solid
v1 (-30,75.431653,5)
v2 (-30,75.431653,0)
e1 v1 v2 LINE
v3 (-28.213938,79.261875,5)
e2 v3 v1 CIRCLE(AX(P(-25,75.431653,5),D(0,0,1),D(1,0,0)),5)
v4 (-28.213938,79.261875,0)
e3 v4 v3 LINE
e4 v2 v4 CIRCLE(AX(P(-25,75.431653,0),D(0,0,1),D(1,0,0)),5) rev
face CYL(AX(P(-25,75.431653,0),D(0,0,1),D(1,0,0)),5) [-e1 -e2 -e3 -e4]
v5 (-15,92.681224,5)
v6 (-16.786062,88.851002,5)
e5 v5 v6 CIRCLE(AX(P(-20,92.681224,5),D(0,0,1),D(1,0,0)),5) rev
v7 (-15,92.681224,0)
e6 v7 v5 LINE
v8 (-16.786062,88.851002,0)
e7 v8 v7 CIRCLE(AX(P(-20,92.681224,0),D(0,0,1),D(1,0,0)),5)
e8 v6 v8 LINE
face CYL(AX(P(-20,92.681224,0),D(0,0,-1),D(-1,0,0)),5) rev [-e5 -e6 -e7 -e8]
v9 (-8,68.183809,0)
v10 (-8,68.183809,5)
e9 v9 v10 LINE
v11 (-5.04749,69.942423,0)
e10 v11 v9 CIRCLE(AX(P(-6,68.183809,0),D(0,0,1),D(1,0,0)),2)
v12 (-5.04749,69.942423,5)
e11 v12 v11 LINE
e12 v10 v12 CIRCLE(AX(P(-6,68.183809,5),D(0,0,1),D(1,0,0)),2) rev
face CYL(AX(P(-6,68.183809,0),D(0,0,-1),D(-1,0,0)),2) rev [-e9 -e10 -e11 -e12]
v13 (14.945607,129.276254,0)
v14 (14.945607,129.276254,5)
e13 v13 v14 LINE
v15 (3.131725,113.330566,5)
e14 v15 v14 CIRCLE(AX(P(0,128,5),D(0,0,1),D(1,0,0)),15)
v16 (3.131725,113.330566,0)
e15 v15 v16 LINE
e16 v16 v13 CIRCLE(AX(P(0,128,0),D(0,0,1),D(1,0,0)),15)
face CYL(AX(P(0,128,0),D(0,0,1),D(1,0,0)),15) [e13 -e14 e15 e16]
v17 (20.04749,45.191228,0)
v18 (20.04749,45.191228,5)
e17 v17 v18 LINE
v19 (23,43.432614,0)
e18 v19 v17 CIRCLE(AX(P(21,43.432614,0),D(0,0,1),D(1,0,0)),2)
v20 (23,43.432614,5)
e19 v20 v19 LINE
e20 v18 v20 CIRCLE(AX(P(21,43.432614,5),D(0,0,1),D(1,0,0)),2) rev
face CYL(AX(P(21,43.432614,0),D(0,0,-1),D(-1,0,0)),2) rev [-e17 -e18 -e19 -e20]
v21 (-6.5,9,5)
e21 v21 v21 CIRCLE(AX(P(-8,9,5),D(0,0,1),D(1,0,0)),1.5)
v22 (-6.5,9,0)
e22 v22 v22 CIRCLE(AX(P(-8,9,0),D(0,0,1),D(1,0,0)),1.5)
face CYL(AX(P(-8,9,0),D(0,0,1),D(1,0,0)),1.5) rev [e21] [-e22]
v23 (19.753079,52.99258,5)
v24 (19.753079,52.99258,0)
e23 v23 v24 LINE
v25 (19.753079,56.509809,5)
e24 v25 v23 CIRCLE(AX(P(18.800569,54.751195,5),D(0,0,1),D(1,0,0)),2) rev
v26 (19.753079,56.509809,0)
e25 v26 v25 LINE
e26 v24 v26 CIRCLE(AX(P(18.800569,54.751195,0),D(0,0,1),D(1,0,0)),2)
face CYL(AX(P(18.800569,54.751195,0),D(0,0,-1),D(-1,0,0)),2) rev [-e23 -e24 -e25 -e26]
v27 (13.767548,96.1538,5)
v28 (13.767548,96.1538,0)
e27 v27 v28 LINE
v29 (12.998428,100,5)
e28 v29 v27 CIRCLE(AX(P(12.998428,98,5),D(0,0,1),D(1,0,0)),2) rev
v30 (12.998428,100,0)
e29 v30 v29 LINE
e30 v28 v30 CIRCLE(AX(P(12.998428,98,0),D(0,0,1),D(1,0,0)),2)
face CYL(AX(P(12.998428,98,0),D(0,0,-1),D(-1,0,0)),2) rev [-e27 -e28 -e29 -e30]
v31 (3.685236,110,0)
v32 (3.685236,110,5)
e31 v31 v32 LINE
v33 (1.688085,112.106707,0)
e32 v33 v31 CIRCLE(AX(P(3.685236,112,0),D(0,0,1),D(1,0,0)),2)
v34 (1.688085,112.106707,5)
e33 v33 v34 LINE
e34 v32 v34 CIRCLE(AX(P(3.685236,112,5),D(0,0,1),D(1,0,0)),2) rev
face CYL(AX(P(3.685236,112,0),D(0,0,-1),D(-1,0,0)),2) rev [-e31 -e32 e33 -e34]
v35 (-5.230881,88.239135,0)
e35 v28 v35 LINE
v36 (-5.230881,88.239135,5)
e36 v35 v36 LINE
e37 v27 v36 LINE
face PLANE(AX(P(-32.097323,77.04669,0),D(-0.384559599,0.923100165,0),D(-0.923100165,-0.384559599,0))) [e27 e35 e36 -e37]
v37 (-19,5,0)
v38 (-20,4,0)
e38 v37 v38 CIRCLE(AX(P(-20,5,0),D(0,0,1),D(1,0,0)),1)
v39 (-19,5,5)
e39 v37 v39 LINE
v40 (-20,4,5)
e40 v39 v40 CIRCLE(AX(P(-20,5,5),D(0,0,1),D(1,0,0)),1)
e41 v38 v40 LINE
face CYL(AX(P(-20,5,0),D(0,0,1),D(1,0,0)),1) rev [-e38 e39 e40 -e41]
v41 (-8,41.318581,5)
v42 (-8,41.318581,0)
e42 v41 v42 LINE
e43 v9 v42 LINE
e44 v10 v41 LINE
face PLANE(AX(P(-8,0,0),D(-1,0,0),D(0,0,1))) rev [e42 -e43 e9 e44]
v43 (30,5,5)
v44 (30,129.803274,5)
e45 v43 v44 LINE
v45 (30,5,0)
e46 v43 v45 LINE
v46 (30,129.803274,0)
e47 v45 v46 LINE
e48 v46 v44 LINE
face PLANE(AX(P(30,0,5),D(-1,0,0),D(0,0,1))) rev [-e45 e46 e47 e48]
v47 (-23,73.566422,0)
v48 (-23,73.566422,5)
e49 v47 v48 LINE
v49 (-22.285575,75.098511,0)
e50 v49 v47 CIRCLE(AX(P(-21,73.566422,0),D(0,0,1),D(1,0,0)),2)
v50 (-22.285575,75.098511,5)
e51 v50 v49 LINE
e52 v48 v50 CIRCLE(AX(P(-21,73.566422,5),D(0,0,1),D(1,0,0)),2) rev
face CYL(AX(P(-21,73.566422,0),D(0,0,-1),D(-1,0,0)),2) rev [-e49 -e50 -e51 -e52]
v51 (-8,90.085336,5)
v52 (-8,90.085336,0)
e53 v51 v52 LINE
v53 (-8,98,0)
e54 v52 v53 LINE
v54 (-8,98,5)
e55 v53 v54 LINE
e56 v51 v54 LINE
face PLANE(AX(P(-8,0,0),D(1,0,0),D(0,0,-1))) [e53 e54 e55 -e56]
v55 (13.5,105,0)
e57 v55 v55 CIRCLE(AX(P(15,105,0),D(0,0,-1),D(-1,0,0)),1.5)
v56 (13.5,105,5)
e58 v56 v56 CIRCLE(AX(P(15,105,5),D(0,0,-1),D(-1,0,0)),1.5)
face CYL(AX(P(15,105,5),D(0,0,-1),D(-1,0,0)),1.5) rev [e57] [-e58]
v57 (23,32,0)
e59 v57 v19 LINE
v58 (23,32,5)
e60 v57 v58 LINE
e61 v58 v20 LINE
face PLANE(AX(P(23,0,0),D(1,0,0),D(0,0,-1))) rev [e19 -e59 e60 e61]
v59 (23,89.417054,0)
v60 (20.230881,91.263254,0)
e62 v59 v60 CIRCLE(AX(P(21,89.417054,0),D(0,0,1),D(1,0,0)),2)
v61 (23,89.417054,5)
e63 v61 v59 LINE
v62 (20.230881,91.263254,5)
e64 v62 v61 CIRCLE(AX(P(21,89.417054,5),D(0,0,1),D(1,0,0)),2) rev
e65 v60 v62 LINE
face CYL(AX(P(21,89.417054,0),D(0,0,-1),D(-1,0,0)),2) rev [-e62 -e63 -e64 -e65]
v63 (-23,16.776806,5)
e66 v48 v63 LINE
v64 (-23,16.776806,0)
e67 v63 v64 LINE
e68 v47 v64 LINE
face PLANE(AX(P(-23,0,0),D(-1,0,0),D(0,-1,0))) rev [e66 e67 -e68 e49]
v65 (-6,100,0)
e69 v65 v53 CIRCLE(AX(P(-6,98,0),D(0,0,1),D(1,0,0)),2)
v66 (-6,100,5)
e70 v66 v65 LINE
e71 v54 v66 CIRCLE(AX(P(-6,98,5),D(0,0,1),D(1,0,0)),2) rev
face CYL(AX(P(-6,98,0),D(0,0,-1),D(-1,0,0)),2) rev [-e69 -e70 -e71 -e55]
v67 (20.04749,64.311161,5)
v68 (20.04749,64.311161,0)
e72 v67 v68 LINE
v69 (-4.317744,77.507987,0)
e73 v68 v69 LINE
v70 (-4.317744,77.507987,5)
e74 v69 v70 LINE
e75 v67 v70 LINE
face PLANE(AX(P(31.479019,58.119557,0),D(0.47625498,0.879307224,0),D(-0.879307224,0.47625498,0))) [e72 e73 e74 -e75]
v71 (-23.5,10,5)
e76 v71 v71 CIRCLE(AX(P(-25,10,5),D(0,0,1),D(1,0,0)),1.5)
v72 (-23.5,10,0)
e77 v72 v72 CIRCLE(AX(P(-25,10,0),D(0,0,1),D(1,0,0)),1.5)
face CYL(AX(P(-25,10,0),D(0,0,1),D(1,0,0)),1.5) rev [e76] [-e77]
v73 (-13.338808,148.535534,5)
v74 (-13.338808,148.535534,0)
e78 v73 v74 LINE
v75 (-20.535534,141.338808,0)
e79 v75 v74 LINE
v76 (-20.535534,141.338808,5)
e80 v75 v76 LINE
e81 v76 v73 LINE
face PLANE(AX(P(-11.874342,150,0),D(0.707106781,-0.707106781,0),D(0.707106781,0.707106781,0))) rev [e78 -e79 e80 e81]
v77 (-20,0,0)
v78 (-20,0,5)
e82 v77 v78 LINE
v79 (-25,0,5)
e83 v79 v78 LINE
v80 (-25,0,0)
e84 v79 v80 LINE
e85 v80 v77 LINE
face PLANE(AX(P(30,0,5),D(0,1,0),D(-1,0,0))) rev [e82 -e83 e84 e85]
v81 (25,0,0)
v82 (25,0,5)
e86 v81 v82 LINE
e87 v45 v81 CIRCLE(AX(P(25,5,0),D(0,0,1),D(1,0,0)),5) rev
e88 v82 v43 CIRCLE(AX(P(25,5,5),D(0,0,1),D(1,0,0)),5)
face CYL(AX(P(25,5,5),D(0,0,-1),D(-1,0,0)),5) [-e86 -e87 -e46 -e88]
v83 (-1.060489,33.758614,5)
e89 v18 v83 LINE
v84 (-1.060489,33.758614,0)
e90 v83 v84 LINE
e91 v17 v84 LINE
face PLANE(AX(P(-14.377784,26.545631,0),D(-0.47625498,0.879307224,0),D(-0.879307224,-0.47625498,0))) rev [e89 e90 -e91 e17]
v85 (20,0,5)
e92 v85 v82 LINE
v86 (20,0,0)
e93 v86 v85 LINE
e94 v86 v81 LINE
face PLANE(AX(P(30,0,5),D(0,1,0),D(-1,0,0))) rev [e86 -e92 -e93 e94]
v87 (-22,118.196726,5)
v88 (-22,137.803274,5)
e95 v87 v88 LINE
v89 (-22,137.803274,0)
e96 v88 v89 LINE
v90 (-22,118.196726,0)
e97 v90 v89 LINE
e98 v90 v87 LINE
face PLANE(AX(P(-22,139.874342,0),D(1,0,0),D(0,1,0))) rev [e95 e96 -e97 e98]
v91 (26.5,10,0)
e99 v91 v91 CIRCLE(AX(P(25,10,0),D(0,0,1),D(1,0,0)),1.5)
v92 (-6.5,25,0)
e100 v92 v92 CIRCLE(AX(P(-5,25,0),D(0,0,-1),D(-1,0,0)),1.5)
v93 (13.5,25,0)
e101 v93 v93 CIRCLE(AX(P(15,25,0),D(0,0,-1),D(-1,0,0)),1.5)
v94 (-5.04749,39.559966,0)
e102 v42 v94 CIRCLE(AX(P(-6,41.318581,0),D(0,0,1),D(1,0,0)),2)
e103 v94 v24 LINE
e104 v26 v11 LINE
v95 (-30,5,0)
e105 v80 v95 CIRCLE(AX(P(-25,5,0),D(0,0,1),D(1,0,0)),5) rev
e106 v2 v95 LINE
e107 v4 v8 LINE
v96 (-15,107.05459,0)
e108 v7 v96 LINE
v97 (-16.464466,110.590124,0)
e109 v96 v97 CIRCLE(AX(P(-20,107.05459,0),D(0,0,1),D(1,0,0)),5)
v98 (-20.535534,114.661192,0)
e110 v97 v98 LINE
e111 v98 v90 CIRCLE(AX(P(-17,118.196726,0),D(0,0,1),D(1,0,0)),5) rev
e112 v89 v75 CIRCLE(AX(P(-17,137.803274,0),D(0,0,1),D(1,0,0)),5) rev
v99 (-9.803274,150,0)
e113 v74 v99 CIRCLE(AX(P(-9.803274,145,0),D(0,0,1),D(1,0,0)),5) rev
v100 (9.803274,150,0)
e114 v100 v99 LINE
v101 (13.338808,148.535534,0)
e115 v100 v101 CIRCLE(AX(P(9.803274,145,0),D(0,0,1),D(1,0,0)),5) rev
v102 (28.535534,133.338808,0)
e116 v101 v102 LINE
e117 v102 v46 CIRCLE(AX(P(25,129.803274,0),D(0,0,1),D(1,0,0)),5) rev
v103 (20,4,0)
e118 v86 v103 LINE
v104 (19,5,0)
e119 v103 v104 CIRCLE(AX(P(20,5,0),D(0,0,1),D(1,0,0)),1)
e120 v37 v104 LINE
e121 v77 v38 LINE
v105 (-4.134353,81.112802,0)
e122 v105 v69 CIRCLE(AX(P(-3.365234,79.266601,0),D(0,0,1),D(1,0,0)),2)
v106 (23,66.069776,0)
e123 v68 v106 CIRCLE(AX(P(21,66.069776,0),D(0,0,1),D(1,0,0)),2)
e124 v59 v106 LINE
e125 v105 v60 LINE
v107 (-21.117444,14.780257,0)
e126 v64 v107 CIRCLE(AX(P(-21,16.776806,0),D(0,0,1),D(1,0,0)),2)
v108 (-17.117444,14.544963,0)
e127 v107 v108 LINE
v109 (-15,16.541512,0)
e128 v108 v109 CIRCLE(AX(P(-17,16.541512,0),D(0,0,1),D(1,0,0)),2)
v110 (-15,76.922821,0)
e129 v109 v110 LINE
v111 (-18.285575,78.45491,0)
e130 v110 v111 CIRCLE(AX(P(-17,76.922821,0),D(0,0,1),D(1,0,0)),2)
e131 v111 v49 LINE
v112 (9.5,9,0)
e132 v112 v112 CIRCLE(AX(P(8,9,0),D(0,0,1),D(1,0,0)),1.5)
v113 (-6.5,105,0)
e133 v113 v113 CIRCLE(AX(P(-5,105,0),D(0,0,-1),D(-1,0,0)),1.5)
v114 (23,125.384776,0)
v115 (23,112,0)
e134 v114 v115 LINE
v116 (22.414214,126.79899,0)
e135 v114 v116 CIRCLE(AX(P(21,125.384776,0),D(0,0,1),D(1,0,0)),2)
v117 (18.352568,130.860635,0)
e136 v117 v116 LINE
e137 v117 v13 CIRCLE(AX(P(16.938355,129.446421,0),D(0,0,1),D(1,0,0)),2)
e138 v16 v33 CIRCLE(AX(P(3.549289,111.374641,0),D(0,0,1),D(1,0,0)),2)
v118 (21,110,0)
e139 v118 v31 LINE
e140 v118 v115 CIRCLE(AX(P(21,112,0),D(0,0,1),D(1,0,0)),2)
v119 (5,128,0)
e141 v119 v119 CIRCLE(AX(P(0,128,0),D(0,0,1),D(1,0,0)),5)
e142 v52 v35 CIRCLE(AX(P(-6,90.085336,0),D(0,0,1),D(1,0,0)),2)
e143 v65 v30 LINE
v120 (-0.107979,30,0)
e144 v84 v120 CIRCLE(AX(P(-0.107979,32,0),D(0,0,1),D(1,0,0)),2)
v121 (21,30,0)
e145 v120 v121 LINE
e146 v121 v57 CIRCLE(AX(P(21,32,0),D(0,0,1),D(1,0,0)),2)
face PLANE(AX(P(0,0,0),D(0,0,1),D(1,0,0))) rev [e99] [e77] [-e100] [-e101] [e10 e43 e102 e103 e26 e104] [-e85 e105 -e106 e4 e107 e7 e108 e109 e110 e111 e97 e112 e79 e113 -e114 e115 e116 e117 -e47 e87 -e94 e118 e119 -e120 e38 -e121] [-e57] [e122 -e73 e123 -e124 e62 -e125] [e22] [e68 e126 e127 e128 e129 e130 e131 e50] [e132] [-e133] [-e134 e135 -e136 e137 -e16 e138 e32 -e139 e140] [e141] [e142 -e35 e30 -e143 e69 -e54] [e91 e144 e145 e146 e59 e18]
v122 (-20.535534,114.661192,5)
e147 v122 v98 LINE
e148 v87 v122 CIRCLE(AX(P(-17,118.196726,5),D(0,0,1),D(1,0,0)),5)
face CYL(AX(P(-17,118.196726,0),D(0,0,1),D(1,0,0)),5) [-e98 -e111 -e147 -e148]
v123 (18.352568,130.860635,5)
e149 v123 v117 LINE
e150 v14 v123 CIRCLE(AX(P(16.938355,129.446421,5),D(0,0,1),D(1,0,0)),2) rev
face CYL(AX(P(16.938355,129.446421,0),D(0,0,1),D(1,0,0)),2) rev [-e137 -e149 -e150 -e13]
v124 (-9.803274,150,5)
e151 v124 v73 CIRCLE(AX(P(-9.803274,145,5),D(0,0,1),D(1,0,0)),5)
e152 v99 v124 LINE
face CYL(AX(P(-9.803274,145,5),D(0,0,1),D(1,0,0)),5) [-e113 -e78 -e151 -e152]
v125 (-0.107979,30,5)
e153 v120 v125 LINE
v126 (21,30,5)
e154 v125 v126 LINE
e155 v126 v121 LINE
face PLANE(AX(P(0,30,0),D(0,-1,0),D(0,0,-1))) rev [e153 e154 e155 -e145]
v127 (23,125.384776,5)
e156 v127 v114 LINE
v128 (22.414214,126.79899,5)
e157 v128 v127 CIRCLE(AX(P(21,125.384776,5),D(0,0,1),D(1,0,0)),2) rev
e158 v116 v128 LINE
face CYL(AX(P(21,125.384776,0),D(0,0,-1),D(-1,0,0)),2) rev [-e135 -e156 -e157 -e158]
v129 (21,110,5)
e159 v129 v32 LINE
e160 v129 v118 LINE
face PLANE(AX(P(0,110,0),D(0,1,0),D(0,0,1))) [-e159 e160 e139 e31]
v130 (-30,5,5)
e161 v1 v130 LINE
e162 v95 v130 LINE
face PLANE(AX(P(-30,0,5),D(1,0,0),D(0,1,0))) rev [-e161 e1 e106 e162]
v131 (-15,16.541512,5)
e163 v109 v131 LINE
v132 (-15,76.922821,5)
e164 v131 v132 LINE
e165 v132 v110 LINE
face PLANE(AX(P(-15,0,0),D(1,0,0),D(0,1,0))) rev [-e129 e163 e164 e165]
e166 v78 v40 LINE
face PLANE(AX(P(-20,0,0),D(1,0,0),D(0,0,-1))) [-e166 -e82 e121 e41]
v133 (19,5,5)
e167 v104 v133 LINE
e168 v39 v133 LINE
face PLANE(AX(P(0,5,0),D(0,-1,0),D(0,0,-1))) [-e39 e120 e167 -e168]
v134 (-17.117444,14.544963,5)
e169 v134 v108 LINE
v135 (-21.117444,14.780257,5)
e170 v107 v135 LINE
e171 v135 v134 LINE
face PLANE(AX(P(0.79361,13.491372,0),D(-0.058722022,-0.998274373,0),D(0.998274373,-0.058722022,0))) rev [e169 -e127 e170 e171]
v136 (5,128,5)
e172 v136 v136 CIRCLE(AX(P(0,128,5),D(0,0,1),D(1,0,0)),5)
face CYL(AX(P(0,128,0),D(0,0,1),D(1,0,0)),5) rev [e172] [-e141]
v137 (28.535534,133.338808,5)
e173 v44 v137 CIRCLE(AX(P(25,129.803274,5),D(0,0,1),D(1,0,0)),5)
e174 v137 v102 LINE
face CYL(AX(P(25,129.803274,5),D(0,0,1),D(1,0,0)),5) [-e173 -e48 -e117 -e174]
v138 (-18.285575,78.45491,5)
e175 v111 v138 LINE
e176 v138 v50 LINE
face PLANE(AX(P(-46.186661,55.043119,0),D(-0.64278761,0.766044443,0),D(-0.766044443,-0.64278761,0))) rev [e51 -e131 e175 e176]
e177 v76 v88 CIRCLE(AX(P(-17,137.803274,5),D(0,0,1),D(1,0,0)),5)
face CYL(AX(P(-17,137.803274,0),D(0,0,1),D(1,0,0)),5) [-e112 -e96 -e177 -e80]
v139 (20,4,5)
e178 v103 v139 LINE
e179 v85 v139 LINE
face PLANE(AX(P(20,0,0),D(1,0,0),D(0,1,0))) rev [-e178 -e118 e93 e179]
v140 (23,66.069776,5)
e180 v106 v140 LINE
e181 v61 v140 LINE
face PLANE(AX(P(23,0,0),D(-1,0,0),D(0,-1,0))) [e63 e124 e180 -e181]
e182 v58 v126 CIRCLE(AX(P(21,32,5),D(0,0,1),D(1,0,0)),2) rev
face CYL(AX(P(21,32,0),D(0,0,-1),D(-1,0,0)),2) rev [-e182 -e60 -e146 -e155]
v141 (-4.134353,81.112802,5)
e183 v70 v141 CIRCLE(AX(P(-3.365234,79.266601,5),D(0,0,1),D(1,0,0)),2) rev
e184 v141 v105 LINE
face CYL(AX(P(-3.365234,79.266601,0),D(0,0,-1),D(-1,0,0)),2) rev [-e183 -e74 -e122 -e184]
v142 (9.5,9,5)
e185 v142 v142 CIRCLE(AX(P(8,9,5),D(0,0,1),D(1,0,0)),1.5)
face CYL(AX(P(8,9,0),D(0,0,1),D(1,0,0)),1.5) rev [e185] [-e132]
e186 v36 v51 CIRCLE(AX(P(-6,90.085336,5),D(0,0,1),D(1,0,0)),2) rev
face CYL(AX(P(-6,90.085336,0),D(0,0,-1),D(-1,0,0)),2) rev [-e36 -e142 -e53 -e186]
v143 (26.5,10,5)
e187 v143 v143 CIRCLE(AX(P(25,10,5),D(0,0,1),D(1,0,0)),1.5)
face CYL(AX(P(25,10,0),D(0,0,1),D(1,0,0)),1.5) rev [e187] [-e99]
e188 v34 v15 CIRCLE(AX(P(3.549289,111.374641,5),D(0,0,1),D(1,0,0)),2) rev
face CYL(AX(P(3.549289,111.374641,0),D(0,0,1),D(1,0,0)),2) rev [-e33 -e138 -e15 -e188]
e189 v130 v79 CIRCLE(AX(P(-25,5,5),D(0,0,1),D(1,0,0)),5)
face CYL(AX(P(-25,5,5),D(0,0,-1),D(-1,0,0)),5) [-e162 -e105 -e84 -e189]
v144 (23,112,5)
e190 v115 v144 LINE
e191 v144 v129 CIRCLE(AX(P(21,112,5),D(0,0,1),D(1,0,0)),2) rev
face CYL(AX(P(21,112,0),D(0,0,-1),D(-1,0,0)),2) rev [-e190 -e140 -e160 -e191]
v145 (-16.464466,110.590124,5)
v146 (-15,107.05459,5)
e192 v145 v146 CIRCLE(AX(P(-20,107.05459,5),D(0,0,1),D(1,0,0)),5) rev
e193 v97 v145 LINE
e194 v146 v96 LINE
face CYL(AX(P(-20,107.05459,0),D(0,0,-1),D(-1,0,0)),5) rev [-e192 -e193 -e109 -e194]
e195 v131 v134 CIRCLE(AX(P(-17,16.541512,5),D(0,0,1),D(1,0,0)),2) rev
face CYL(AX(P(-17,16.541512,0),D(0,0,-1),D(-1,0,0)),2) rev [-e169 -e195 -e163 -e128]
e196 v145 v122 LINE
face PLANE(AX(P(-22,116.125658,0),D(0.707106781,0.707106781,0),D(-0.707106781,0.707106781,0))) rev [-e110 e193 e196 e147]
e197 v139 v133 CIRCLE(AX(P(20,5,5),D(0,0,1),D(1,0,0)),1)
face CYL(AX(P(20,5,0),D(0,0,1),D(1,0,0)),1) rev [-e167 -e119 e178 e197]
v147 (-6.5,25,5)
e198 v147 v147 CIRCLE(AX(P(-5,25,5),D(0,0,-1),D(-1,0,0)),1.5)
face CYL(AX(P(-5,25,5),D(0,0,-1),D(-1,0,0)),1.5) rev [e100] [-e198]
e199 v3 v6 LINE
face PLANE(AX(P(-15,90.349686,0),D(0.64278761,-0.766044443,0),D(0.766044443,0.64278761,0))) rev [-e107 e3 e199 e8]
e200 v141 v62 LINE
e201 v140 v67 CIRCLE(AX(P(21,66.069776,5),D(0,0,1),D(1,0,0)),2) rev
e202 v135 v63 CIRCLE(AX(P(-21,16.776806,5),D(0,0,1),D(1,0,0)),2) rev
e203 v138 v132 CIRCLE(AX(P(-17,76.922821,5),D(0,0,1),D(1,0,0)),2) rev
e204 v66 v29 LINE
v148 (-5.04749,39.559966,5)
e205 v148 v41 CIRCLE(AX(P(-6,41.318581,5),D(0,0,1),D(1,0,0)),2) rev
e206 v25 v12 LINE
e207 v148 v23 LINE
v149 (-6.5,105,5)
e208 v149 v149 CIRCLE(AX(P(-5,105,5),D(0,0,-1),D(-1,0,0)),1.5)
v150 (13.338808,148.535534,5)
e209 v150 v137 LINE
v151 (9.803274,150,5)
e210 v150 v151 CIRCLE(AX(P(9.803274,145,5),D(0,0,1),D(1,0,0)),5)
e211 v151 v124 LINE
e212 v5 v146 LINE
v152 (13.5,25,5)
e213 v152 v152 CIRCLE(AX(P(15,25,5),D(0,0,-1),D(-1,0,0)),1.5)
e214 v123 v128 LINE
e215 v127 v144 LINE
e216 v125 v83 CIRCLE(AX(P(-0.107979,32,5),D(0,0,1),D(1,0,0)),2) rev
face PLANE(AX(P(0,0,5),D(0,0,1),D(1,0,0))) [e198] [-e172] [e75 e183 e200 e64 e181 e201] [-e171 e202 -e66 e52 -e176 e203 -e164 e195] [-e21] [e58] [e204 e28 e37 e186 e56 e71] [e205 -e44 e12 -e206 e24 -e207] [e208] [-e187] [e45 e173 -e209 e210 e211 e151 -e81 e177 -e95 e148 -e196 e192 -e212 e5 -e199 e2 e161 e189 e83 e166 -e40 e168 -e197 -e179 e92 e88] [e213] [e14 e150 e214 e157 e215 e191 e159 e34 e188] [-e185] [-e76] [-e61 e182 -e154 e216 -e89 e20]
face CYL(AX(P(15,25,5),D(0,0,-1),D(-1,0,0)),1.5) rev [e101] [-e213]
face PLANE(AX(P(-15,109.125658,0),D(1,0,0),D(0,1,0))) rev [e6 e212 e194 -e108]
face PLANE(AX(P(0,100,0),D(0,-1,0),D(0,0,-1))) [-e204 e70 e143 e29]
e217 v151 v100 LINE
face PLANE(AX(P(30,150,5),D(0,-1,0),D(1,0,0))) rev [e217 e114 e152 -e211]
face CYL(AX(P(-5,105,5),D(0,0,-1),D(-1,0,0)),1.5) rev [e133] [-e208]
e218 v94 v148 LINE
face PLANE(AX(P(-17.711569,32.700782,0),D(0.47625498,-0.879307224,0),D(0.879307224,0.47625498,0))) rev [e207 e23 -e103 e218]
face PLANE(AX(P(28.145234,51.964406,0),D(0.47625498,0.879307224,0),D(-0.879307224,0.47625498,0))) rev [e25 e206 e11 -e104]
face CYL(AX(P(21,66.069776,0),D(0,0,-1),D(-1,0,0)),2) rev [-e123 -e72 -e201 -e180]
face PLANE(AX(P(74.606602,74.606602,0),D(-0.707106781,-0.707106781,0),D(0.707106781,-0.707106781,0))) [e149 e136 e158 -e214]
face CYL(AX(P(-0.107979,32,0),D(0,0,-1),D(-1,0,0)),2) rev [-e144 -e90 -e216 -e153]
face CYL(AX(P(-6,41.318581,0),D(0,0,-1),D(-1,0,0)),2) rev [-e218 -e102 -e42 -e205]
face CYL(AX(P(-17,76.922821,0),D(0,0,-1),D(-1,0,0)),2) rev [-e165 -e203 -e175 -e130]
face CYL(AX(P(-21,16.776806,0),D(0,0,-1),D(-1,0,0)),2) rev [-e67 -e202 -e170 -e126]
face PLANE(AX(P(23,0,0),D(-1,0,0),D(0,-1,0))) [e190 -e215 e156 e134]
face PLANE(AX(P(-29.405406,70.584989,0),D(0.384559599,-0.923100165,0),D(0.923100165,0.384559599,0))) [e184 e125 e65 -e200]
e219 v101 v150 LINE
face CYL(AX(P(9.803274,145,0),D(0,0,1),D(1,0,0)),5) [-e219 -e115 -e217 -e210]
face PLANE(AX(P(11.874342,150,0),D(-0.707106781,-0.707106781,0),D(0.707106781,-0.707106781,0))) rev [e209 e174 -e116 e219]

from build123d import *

# Parameters (mm, degrees)
SKETCH_1_W          = 60
SKETCH_1_H          = 150
EXTRUDE_1_DEPTH     = 5
SKETCH_2_R          = 1.5
CUT_EXTRUDE_1_DEPTH = 5
SKETCH_4_R          = 5
PITCH_DEPTH         = 154.05227865
CUT_EXTRUDE_2_DEPTH = 154.05227865
SKETCH_6_R          = 1.5
CUT_EXTRUDE_3_DEPTH = 154.05227865
CUT_EXTRUDE_4_DEPTH = 154.05227865
FILLET_1_R          = 2
FILLET_2_R          = 5


with BuildPart() as part:
    # 草图1 → 凸台-拉伸1 (new body)
    with BuildSketch(Plane.XY):
        with Locations((0, 75)):
            Rectangle(SKETCH_1_W, SKETCH_1_H)
    extrude(amount=EXTRUDE_1_DEPTH)

    # 草图2 → 切除-拉伸1 (cut)
    with BuildSketch(Plane.XY.offset(5)):
        with BuildLine():
            Line((-20, 4), (-20, 0))
            Line((-20, 0), (20, 0))
            Line((20, 0), (20, 4))
            ThreePointArc((20, 4), (20.707106781, 5.707106781), (19, 5))
            Line((19, 5), (-19, 5))
            ThreePointArc((-19, 5), (-20.707106781, 5.707106781), (-20, 4))
        make_face()
        with Locations((-25, 10)):
            Circle(SKETCH_2_R)
        with Locations((25, 10)):
            Circle(SKETCH_2_R)
        with Locations((8, 9)):
            Circle(SKETCH_2_R)
        with Locations((-8, 9)):
            Circle(SKETCH_2_R)
    extrude(amount=-CUT_EXTRUDE_1_DEPTH, mode=Mode.SUBTRACT)

    # 草图4 → pitch (cut, through all)
    with BuildSketch(Plane.XY.offset(5)):
        with Locations((0, 128)):
            Circle(SKETCH_4_R)
    extrude(amount=-PITCH_DEPTH, mode=Mode.SUBTRACT)

    # 草图5 → 切除-拉伸2 (cut, through all)
    with BuildSketch(Plane.XY.offset(5)):
        Polygon((-15, 106.983208217), (-15, 90.349685577), (-30, 77.76319111), (-30, 124.859512106), (-30, 150), (-11.874342087, 150), (-22, 139.874342087), (-22, 116.125657913), (-15, 109.125657913), align=None)
        Polygon((11.874342087, 150), (30, 131.874342087), (30, 150), align=None)
    extrude(amount=-CUT_EXTRUDE_2_DEPTH, mode=Mode.SUBTRACT)

    # 草图6 → 切除-拉伸3 (cut, through all)
    with BuildSketch(Plane(origin=(0, 0, 0), x_dir=(-1, 0, 0), z_dir=(0, 0, -1))):
        with Locations((5, 105)):
            Circle(SKETCH_6_R)
        with Locations((-15, 105)):
            Circle(SKETCH_6_R)
        with Locations((-15, 25)):
            Circle(SKETCH_6_R)
        with Locations((5, 25)):
            Circle(SKETCH_6_R)
    extrude(amount=-CUT_EXTRUDE_3_DEPTH, mode=Mode.SUBTRACT)

    # 草图7 → 切除-拉伸4 (cut, through all)
    with BuildSketch(Plane.XY.offset(5)):
        Polygon((-23, 14.89099599), (-15, 14.420407755), (-15, 81.211834552), (-23, 74.499037502), align=None)
        Polygon((-8, 37.960812568), (23, 54.751194786), (-8, 71.541577003), align=None)
        Polygon((23, 30), (23, 46.790382217), (-8, 30), align=None)
        Polygon((-8, 79.502389571), (23, 92.416857601), (23, 62.712007354), align=None)
        Polygon((-8, 87.08553197), (-8, 100), (23, 100), align=None)
        with BuildLine():
            Line((23, 126.213203436), (10.606601718, 138.606601718))
            ThreePointArc((10.606601718, 138.606601718), (13.858192988, 133.740251485), (15, 128))
            ThreePointArc((15, 128), (11.252224106, 118.080955053), (1.881672979, 113.118491111))
            Line((1.881672979, 113.118491111), (1.203740129, 110))
            Line((1.203740129, 110), (23, 110))
            Line((23, 110), (23, 126.213203436))
        make_face()
    extrude(amount=-CUT_EXTRUDE_4_DEPTH, mode=Mode.SUBTRACT)

    # 圆角1
    # the kernel refuses this fillet: 2 mm, written as the material it adds along each edge
    with BuildSketch(Plane(origin=(23, 92.416857601, 5), x_dir=(0, -1, 0), z_dir=(0, 0, -1))) as fillet_1_piece_1:
        with BuildLine():
            CenterArc((FILLET_1_R * 1.49990179984, FILLET_1_R), FILLET_1_R, 157.383597643, 112.616402357)
            Line((FILLET_1_R * 0.576801634755, FILLET_1_R * 1.38455959905), (FILLET_1_R * 0.558339631453, FILLET_1_R * 1.39225079103))
            Line((FILLET_1_R * 0.558339631453, FILLET_1_R * 1.39225079103), (-FILLET_1_R * 0.0299980359968, -FILLET_1_R * 0.02))
            Line((-FILLET_1_R * 0.0299980359968, -FILLET_1_R * 0.02), (FILLET_1_R * 1.49990179984, -FILLET_1_R * 0.02))
            Line((FILLET_1_R * 1.49990179984, -FILLET_1_R * 0.02), (FILLET_1_R * 1.49990179984, 0))
        make_face()
    extrude(amount=5)
    with BuildSketch(Plane(origin=(23, 62.712007354, 5), x_dir=(0, 1, 0), z_dir=(0, 0, -1)), Plane(origin=(-8, 71.541577003, 5), x_dir=(0, -1, 0), z_dir=(0, 0, -1)), Plane(origin=(-8, 37.960812568, 5), x_dir=(0.8793072239666883, 0.4762549799004691, 0), z_dir=(0, 0, -1))) as fillet_1_piece_2:
        with BuildLine():
            CenterArc((FILLET_1_R * 1.67888417116, -FILLET_1_R), FILLET_1_R, 90, 118.441093136)
            Line((FILLET_1_R * 0.799576947189, -FILLET_1_R * 1.4762549799), (FILLET_1_R * 0.78199080271, -FILLET_1_R * 1.4857800795))
            Line((FILLET_1_R * 0.78199080271, -FILLET_1_R * 1.4857800795), (-FILLET_1_R * 0.0335776834231, FILLET_1_R * 0.02))
            Line((-FILLET_1_R * 0.0335776834231, FILLET_1_R * 0.02), (FILLET_1_R * 1.67888417116, FILLET_1_R * 0.02))
            Line((FILLET_1_R * 1.67888417116, FILLET_1_R * 0.02), (FILLET_1_R * 1.67888417116, 0))
        make_face()
    extrude(amount=5)
    with BuildSketch(Plane(origin=(-8, 79.502389571, 5), x_dir=(0.8793072239666883, -0.4762549799004693, 0), z_dir=(0, 0, -1))) as fillet_1_piece_3:
        with BuildLine():
            CenterArc((FILLET_1_R * 2.09383929261, -FILLET_1_R), FILLET_1_R, 90, 128.942504507)
            Line((FILLET_1_R * 1.31606220856, -FILLET_1_R * 1.62854021949), (FILLET_1_R * 1.30050666688, -FILLET_1_R * 1.64111102388))
            Line((FILLET_1_R * 1.30050666688, -FILLET_1_R * 1.64111102388), (-FILLET_1_R * 0.0155555416811, -FILLET_1_R * 0.0125708043898))
            Line((-FILLET_1_R * 0.0155555416811, -FILLET_1_R * 0.0125708043898), (0, FILLET_1_R * 0.02))
            Line((0, FILLET_1_R * 0.02), (FILLET_1_R * 2.09383929261, FILLET_1_R * 0.02))
            Line((FILLET_1_R * 2.09383929261, FILLET_1_R * 0.02), (FILLET_1_R * 2.09383929261, 0))
        make_face()
    extrude(amount=5)
    with BuildSketch(Plane(origin=(23, 126.213203436, 5), x_dir=(-0.7071067811865497, 0.7071067811865455, 0), z_dir=(0, 0, -1))) as fillet_1_piece_4:
        with BuildLine():
            CenterArc((FILLET_1_R * 0.414213562373, -FILLET_1_R), FILLET_1_R, 90, 45)
            Line((-FILLET_1_R * 0.292893218813, -FILLET_1_R * 0.292893218813), (-FILLET_1_R * 0.307035354437, -FILLET_1_R * 0.27875108319))
            Line((-FILLET_1_R * 0.307035354437, -FILLET_1_R * 0.27875108319), (-FILLET_1_R * 0.00828427124746, FILLET_1_R * 0.02))
            Line((-FILLET_1_R * 0.00828427124746, FILLET_1_R * 0.02), (FILLET_1_R * 0.414213562373, FILLET_1_R * 0.02))
            Line((FILLET_1_R * 0.414213562373, FILLET_1_R * 0.02), (FILLET_1_R * 0.414213562373, 0))
        make_face()
    extrude(amount=5)
    with BuildSketch(Plane(origin=(23, 110, 5), x_dir=(0, 1, 0), z_dir=(0, 0, -1)), Plane(origin=(23, 30, 5), x_dir=(0, 1, 0), z_dir=(0, 0, -1))) as fillet_1_piece_5:
        with BuildLine():
            CenterArc((FILLET_1_R, -FILLET_1_R), FILLET_1_R, 90, 90)
            Line((0, -FILLET_1_R), (-FILLET_1_R * 0.02, -FILLET_1_R))
            Line((-FILLET_1_R * 0.02, -FILLET_1_R), (-FILLET_1_R * 0.02, FILLET_1_R * 0.02))
            Line((-FILLET_1_R * 0.02, FILLET_1_R * 0.02), (FILLET_1_R, FILLET_1_R * 0.02))
            Line((FILLET_1_R, FILLET_1_R * 0.02), (FILLET_1_R, 0))
        make_face()
    extrude(amount=5)
    with BuildSketch(Plane(origin=(1.203740129, 110, 5), x_dir=(1, 0, 0), z_dir=(0, 0, -1))) as fillet_1_piece_6:
        with BuildLine():
            CenterArc((FILLET_1_R * 1.24074802573, -FILLET_1_R), FILLET_1_R, 90, 102.264773728)
            Line((FILLET_1_R * 0.263571661811, -FILLET_1_R * 1.21242964433), (FILLET_1_R * 0.244028134533, -FILLET_1_R * 1.21667823722))
            Line((FILLET_1_R * 0.244028134533, -FILLET_1_R * 1.21667823722), (-FILLET_1_R * 0.0248149605147, FILLET_1_R * 0.02))
            Line((-FILLET_1_R * 0.0248149605147, FILLET_1_R * 0.02), (FILLET_1_R * 1.24074802573, FILLET_1_R * 0.02))
            Line((FILLET_1_R * 1.24074802573, FILLET_1_R * 0.02), (FILLET_1_R * 1.24074802573, 0))
        make_face()
    extrude(amount=5)
    with BuildSketch(Plane(origin=(1.881672979, 113.118491111, 5), x_dir=(-0.2124296443310413, -0.9771763639228015, 0), z_dir=(0, 0, -1))) as fillet_1_piece_7:
        with BuildLine():
            CenterArc((1.349797761, -2), FILLET_1_R, 90, 65.684260829)
            Line((-0.472782637, -1.176470588), (-0.509234245, -1.16))
            ThreePointArc((-0.509234245, -1.16), (-0.261070379, -0.578317638), (-0.037712362, 0.013333333))
            Line((-0.037712362, 0.013333333), (0, 0.04))
            Line((0, 0.04), (1.349797761, 0.04))
            Line((1.349797761, 0.04), (1.349797761, 0))
        make_face()
    extrude(amount=5)
    with BuildSketch(Plane(origin=(-8, 30, 5), x_dir=(1, 0, 0), z_dir=(0, 0, -1))) as fillet_1_piece_8:
        with BuildLine():
            CenterArc((FILLET_1_R * 3.94601065244, -FILLET_1_R), FILLET_1_R, 90, 151.558906864)
            Line((FILLET_1_R * 3.46975567254, -FILLET_1_R * 1.87930722397), (FILLET_1_R * 3.46023057295, -FILLET_1_R * 1.89689336845))
            Line((FILLET_1_R * 3.46023057295, -FILLET_1_R * 1.89689336845), (-FILLET_1_R * 0.00952509959801, -FILLET_1_R * 0.0175861444793))
            Line((-FILLET_1_R * 0.00952509959801, -FILLET_1_R * 0.0175861444793), (0, FILLET_1_R * 0.02))
            Line((0, FILLET_1_R * 0.02), (FILLET_1_R * 3.94601065244, FILLET_1_R * 0.02))
            Line((FILLET_1_R * 3.94601065244, FILLET_1_R * 0.02), (FILLET_1_R * 3.94601065244, 0))
        make_face()
    extrude(amount=5)
    with BuildSketch(Plane(origin=(23, 46.790382217, 5), x_dir=(0, -1, 0), z_dir=(0, 0, -1))) as fillet_1_piece_9:
        with BuildLine():
            CenterArc((FILLET_1_R * 1.67888417116, FILLET_1_R), FILLET_1_R, 151.558906864, 118.441093136)
            Line((FILLET_1_R * 0.799576947189, FILLET_1_R * 1.4762549799), (FILLET_1_R * 0.78199080271, FILLET_1_R * 1.4857800795))
            Line((FILLET_1_R * 0.78199080271, FILLET_1_R * 1.4857800795), (-FILLET_1_R * 0.0335776834231, -FILLET_1_R * 0.02))
            Line((-FILLET_1_R * 0.0335776834231, -FILLET_1_R * 0.02), (FILLET_1_R * 1.67888417116, -FILLET_1_R * 0.02))
            Line((FILLET_1_R * 1.67888417116, -FILLET_1_R * 0.02), (FILLET_1_R * 1.67888417116, 0))
        make_face()
    extrude(amount=5)
    with BuildSketch(Plane(origin=(23, 54.751194786, 5), x_dir=(-0.8793072239666878, -0.47625497990046983, 0), z_dir=(0, 0, -1))) as fillet_1_piece_10:
        with BuildLine():
            CenterArc((FILLET_1_R * 1.84629507528, FILLET_1_R), FILLET_1_R, 146.882186272, 123.117813728)
            Line((FILLET_1_R * 1.00874618672, FILLET_1_R * 1.54636238824), (FILLET_1_R * 0.991995208953, FILLET_1_R * 1.557289636))
            Line((FILLET_1_R * 0.991995208953, FILLET_1_R * 1.557289636), (-FILLET_1_R * 0.0167509777711, FILLET_1_R * 0.0109272477648))
            Line((-FILLET_1_R * 0.0167509777711, FILLET_1_R * 0.0109272477648), (0, -FILLET_1_R * 0.02))
            Line((0, -FILLET_1_R * 0.02), (FILLET_1_R * 1.84629507528, -FILLET_1_R * 0.02))
            Line((FILLET_1_R * 1.84629507528, -FILLET_1_R * 0.02), (FILLET_1_R * 1.84629507528, 0))
        make_face()
    extrude(amount=5)
    with BuildSketch(Plane(origin=(-8, 100, 5), x_dir=(1, 0, 0), z_dir=(0, 0, -1))) as fillet_1_piece_11:
        with BuildLine():
            CenterArc((FILLET_1_R, FILLET_1_R), FILLET_1_R, 180, 90)
            Line((0, FILLET_1_R), (-FILLET_1_R * 0.02, FILLET_1_R))
            Line((-FILLET_1_R * 0.02, FILLET_1_R), (-FILLET_1_R * 0.02, -FILLET_1_R * 0.02))
            Line((-FILLET_1_R * 0.02, -FILLET_1_R * 0.02), (FILLET_1_R, -FILLET_1_R * 0.02))
            Line((FILLET_1_R, -FILLET_1_R * 0.02), (FILLET_1_R, 0))
        make_face()
    extrude(amount=5)
    with BuildSketch(Plane(origin=(23, 100, 5), x_dir=(-1, 0, 0), z_dir=(0, 0, -1))) as fillet_1_piece_12:
        with BuildLine():
            CenterArc((FILLET_1_R * 5.0007857556, -FILLET_1_R), FILLET_1_R, 90, 157.383597643)
            Line((FILLET_1_R * 4.61622615655, -FILLET_1_R * 1.92310016509), (FILLET_1_R * 4.60853496457, -FILLET_1_R * 1.94156216839))
            Line((FILLET_1_R * 4.60853496457, -FILLET_1_R * 1.94156216839), (-FILLET_1_R * 0.00769119198092, -FILLET_1_R * 0.0184620033017))
            Line((-FILLET_1_R * 0.00769119198092, -FILLET_1_R * 0.0184620033017), (0, FILLET_1_R * 0.02))
            Line((0, FILLET_1_R * 0.02), (FILLET_1_R * 5.0007857556, FILLET_1_R * 0.02))
            Line((FILLET_1_R * 5.0007857556, FILLET_1_R * 0.02), (FILLET_1_R * 5.0007857556, 0))
        make_face()
    extrude(amount=5)
    with BuildSketch(Plane(origin=(-8, 87.08553197, 5), x_dir=(0.923100165085959, 0.38455959904581105, 0), z_dir=(0, 0, -1))) as fillet_1_piece_13:
        with BuildLine():
            CenterArc((FILLET_1_R * 1.49990179984, -FILLET_1_R), FILLET_1_R, 90, 112.616402357)
            Line((FILLET_1_R * 0.576801634755, -FILLET_1_R * 1.38455959905), (FILLET_1_R * 0.558339631453, -FILLET_1_R * 1.39225079103))
            Line((FILLET_1_R * 0.558339631453, -FILLET_1_R * 1.39225079103), (-FILLET_1_R * 0.0299980359968, FILLET_1_R * 0.02))
            Line((-FILLET_1_R * 0.0299980359968, FILLET_1_R * 0.02), (FILLET_1_R * 1.49990179984, FILLET_1_R * 0.02))
            Line((FILLET_1_R * 1.49990179984, FILLET_1_R * 0.02), (FILLET_1_R * 1.49990179984, 0))
        make_face()
    extrude(amount=5)
    with BuildSketch(Plane(origin=(-15, 81.211834552, 5), x_dir=(-0.7660444431189756, -0.6427876096865422, 0), z_dir=(0, 0, -1))) as fillet_1_piece_14:
        with BuildLine():
            CenterArc((FILLET_1_R * 2.14450692051, -FILLET_1_R), FILLET_1_R, 90, 130)
            Line((FILLET_1_R * 1.37846247739, -FILLET_1_R * 1.64278760969), (FILLET_1_R * 1.36314158853, -FILLET_1_R * 1.65564336188))
            Line((FILLET_1_R * 1.36314158853, -FILLET_1_R * 1.65564336188), (-FILLET_1_R * 0.0153208888624, -FILLET_1_R * 0.0128557521937))
            Line((-FILLET_1_R * 0.0153208888624, -FILLET_1_R * 0.0128557521937), (0, FILLET_1_R * 0.02))
            Line((0, FILLET_1_R * 0.02), (FILLET_1_R * 2.14450692051, FILLET_1_R * 0.02))
            Line((FILLET_1_R * 2.14450692051, FILLET_1_R * 0.02), (FILLET_1_R * 2.14450692051, 0))
        make_face()
    extrude(amount=5)
    with BuildSketch(Plane(origin=(-15, 14.420407755, 5), x_dir=(-0.9982743731749961, 0.05872202195146987, 0), z_dir=(0, 0, -1))) as fillet_1_piece_15:
        with BuildLine():
            CenterArc((FILLET_1_R * 1.06055213917, FILLET_1_R), FILLET_1_R, 176.633539337, 93.366460663)
            Line((FILLET_1_R * 0.0622777659971, FILLET_1_R * 1.05872202195), (FILLET_1_R * 0.0423122785336, FILLET_1_R * 1.05989646239))
            Line((FILLET_1_R * 0.0423122785336, FILLET_1_R * 1.05989646239), (-FILLET_1_R * 0.0212110427834, -FILLET_1_R * 0.02))
            Line((-FILLET_1_R * 0.0212110427834, -FILLET_1_R * 0.02), (FILLET_1_R * 1.06055213917, -FILLET_1_R * 0.02))
            Line((FILLET_1_R * 1.06055213917, -FILLET_1_R * 0.02), (FILLET_1_R * 1.06055213917, 0))
        make_face()
    extrude(amount=5)
    with BuildSketch(Plane(origin=(-23, 14.89099599, 5), x_dir=(0.998274373174996, -0.05872202195146952, 0), z_dir=(0, 0, -1))) as fillet_1_piece_16:
        with BuildLine():
            CenterArc((FILLET_1_R * 0.942905080349, -FILLET_1_R), FILLET_1_R, 90, 86.633539337)
            Line((-FILLET_1_R * 0.0553692928264, -FILLET_1_R * 0.941277978049), (-FILLET_1_R * 0.0753347802899, -FILLET_1_R * 0.94010353761))
            Line((-FILLET_1_R * 0.0753347802899, -FILLET_1_R * 0.94010353761), (-FILLET_1_R * 0.018858101607, FILLET_1_R * 0.02))
            Line((-FILLET_1_R * 0.018858101607, FILLET_1_R * 0.02), (FILLET_1_R * 0.942905080349, FILLET_1_R * 0.02))
            Line((FILLET_1_R * 0.942905080349, FILLET_1_R * 0.02), (FILLET_1_R * 0.942905080349, 0))
        make_face()
    extrude(amount=5)
    with BuildSketch(Plane(origin=(-23, 74.499037502, 5), x_dir=(0, -1, 0), z_dir=(0, 0, -1))) as fillet_1_piece_17:
        with BuildLine():
            CenterArc((FILLET_1_R * 0.466307658155, -FILLET_1_R), FILLET_1_R, 90, 50)
            Line((-FILLET_1_R * 0.299736784964, -FILLET_1_R * 0.357212390313), (-FILLET_1_R * 0.315057673826, -FILLET_1_R * 0.34435663812))
            Line((-FILLET_1_R * 0.315057673826, -FILLET_1_R * 0.34435663812), (-FILLET_1_R * 0.0093261531631, FILLET_1_R * 0.02))
            Line((-FILLET_1_R * 0.0093261531631, FILLET_1_R * 0.02), (FILLET_1_R * 0.466307658155, FILLET_1_R * 0.02))
            Line((FILLET_1_R * 0.466307658155, FILLET_1_R * 0.02), (FILLET_1_R * 0.466307658155, 0))
        make_face()
    extrude(amount=5)
    fillet_1_2_edges = [part.edges().sort_by_distance(p)[0] for p in [
        (10.606601718, 138.606601718, 2.5),
    ]]
    fillet(fillet_1_2_edges, radius=FILLET_1_R)

    # 圆角2
    fillet_2_edges = [part.edges().sort_by_distance(p)[0] for p in [
        (-11.874342087, 150, 2.5),
        (-22, 139.874342087, 2.5),
        (-22, 116.125657913, 2.5),
        (-15, 109.125657913, 2.5),
        (-15, 90.349685577, 2.5),
        (-30, 77.76319111, 2.5),
        (30, 0, 2.5),
        (-30, 0, 2.5),
        (11.874342087, 150, 2.5),
        (30, 131.874342087, 2.5),
    ]]
    fillet(fillet_2_edges, radius=FILLET_2_R)


solid = part.part
